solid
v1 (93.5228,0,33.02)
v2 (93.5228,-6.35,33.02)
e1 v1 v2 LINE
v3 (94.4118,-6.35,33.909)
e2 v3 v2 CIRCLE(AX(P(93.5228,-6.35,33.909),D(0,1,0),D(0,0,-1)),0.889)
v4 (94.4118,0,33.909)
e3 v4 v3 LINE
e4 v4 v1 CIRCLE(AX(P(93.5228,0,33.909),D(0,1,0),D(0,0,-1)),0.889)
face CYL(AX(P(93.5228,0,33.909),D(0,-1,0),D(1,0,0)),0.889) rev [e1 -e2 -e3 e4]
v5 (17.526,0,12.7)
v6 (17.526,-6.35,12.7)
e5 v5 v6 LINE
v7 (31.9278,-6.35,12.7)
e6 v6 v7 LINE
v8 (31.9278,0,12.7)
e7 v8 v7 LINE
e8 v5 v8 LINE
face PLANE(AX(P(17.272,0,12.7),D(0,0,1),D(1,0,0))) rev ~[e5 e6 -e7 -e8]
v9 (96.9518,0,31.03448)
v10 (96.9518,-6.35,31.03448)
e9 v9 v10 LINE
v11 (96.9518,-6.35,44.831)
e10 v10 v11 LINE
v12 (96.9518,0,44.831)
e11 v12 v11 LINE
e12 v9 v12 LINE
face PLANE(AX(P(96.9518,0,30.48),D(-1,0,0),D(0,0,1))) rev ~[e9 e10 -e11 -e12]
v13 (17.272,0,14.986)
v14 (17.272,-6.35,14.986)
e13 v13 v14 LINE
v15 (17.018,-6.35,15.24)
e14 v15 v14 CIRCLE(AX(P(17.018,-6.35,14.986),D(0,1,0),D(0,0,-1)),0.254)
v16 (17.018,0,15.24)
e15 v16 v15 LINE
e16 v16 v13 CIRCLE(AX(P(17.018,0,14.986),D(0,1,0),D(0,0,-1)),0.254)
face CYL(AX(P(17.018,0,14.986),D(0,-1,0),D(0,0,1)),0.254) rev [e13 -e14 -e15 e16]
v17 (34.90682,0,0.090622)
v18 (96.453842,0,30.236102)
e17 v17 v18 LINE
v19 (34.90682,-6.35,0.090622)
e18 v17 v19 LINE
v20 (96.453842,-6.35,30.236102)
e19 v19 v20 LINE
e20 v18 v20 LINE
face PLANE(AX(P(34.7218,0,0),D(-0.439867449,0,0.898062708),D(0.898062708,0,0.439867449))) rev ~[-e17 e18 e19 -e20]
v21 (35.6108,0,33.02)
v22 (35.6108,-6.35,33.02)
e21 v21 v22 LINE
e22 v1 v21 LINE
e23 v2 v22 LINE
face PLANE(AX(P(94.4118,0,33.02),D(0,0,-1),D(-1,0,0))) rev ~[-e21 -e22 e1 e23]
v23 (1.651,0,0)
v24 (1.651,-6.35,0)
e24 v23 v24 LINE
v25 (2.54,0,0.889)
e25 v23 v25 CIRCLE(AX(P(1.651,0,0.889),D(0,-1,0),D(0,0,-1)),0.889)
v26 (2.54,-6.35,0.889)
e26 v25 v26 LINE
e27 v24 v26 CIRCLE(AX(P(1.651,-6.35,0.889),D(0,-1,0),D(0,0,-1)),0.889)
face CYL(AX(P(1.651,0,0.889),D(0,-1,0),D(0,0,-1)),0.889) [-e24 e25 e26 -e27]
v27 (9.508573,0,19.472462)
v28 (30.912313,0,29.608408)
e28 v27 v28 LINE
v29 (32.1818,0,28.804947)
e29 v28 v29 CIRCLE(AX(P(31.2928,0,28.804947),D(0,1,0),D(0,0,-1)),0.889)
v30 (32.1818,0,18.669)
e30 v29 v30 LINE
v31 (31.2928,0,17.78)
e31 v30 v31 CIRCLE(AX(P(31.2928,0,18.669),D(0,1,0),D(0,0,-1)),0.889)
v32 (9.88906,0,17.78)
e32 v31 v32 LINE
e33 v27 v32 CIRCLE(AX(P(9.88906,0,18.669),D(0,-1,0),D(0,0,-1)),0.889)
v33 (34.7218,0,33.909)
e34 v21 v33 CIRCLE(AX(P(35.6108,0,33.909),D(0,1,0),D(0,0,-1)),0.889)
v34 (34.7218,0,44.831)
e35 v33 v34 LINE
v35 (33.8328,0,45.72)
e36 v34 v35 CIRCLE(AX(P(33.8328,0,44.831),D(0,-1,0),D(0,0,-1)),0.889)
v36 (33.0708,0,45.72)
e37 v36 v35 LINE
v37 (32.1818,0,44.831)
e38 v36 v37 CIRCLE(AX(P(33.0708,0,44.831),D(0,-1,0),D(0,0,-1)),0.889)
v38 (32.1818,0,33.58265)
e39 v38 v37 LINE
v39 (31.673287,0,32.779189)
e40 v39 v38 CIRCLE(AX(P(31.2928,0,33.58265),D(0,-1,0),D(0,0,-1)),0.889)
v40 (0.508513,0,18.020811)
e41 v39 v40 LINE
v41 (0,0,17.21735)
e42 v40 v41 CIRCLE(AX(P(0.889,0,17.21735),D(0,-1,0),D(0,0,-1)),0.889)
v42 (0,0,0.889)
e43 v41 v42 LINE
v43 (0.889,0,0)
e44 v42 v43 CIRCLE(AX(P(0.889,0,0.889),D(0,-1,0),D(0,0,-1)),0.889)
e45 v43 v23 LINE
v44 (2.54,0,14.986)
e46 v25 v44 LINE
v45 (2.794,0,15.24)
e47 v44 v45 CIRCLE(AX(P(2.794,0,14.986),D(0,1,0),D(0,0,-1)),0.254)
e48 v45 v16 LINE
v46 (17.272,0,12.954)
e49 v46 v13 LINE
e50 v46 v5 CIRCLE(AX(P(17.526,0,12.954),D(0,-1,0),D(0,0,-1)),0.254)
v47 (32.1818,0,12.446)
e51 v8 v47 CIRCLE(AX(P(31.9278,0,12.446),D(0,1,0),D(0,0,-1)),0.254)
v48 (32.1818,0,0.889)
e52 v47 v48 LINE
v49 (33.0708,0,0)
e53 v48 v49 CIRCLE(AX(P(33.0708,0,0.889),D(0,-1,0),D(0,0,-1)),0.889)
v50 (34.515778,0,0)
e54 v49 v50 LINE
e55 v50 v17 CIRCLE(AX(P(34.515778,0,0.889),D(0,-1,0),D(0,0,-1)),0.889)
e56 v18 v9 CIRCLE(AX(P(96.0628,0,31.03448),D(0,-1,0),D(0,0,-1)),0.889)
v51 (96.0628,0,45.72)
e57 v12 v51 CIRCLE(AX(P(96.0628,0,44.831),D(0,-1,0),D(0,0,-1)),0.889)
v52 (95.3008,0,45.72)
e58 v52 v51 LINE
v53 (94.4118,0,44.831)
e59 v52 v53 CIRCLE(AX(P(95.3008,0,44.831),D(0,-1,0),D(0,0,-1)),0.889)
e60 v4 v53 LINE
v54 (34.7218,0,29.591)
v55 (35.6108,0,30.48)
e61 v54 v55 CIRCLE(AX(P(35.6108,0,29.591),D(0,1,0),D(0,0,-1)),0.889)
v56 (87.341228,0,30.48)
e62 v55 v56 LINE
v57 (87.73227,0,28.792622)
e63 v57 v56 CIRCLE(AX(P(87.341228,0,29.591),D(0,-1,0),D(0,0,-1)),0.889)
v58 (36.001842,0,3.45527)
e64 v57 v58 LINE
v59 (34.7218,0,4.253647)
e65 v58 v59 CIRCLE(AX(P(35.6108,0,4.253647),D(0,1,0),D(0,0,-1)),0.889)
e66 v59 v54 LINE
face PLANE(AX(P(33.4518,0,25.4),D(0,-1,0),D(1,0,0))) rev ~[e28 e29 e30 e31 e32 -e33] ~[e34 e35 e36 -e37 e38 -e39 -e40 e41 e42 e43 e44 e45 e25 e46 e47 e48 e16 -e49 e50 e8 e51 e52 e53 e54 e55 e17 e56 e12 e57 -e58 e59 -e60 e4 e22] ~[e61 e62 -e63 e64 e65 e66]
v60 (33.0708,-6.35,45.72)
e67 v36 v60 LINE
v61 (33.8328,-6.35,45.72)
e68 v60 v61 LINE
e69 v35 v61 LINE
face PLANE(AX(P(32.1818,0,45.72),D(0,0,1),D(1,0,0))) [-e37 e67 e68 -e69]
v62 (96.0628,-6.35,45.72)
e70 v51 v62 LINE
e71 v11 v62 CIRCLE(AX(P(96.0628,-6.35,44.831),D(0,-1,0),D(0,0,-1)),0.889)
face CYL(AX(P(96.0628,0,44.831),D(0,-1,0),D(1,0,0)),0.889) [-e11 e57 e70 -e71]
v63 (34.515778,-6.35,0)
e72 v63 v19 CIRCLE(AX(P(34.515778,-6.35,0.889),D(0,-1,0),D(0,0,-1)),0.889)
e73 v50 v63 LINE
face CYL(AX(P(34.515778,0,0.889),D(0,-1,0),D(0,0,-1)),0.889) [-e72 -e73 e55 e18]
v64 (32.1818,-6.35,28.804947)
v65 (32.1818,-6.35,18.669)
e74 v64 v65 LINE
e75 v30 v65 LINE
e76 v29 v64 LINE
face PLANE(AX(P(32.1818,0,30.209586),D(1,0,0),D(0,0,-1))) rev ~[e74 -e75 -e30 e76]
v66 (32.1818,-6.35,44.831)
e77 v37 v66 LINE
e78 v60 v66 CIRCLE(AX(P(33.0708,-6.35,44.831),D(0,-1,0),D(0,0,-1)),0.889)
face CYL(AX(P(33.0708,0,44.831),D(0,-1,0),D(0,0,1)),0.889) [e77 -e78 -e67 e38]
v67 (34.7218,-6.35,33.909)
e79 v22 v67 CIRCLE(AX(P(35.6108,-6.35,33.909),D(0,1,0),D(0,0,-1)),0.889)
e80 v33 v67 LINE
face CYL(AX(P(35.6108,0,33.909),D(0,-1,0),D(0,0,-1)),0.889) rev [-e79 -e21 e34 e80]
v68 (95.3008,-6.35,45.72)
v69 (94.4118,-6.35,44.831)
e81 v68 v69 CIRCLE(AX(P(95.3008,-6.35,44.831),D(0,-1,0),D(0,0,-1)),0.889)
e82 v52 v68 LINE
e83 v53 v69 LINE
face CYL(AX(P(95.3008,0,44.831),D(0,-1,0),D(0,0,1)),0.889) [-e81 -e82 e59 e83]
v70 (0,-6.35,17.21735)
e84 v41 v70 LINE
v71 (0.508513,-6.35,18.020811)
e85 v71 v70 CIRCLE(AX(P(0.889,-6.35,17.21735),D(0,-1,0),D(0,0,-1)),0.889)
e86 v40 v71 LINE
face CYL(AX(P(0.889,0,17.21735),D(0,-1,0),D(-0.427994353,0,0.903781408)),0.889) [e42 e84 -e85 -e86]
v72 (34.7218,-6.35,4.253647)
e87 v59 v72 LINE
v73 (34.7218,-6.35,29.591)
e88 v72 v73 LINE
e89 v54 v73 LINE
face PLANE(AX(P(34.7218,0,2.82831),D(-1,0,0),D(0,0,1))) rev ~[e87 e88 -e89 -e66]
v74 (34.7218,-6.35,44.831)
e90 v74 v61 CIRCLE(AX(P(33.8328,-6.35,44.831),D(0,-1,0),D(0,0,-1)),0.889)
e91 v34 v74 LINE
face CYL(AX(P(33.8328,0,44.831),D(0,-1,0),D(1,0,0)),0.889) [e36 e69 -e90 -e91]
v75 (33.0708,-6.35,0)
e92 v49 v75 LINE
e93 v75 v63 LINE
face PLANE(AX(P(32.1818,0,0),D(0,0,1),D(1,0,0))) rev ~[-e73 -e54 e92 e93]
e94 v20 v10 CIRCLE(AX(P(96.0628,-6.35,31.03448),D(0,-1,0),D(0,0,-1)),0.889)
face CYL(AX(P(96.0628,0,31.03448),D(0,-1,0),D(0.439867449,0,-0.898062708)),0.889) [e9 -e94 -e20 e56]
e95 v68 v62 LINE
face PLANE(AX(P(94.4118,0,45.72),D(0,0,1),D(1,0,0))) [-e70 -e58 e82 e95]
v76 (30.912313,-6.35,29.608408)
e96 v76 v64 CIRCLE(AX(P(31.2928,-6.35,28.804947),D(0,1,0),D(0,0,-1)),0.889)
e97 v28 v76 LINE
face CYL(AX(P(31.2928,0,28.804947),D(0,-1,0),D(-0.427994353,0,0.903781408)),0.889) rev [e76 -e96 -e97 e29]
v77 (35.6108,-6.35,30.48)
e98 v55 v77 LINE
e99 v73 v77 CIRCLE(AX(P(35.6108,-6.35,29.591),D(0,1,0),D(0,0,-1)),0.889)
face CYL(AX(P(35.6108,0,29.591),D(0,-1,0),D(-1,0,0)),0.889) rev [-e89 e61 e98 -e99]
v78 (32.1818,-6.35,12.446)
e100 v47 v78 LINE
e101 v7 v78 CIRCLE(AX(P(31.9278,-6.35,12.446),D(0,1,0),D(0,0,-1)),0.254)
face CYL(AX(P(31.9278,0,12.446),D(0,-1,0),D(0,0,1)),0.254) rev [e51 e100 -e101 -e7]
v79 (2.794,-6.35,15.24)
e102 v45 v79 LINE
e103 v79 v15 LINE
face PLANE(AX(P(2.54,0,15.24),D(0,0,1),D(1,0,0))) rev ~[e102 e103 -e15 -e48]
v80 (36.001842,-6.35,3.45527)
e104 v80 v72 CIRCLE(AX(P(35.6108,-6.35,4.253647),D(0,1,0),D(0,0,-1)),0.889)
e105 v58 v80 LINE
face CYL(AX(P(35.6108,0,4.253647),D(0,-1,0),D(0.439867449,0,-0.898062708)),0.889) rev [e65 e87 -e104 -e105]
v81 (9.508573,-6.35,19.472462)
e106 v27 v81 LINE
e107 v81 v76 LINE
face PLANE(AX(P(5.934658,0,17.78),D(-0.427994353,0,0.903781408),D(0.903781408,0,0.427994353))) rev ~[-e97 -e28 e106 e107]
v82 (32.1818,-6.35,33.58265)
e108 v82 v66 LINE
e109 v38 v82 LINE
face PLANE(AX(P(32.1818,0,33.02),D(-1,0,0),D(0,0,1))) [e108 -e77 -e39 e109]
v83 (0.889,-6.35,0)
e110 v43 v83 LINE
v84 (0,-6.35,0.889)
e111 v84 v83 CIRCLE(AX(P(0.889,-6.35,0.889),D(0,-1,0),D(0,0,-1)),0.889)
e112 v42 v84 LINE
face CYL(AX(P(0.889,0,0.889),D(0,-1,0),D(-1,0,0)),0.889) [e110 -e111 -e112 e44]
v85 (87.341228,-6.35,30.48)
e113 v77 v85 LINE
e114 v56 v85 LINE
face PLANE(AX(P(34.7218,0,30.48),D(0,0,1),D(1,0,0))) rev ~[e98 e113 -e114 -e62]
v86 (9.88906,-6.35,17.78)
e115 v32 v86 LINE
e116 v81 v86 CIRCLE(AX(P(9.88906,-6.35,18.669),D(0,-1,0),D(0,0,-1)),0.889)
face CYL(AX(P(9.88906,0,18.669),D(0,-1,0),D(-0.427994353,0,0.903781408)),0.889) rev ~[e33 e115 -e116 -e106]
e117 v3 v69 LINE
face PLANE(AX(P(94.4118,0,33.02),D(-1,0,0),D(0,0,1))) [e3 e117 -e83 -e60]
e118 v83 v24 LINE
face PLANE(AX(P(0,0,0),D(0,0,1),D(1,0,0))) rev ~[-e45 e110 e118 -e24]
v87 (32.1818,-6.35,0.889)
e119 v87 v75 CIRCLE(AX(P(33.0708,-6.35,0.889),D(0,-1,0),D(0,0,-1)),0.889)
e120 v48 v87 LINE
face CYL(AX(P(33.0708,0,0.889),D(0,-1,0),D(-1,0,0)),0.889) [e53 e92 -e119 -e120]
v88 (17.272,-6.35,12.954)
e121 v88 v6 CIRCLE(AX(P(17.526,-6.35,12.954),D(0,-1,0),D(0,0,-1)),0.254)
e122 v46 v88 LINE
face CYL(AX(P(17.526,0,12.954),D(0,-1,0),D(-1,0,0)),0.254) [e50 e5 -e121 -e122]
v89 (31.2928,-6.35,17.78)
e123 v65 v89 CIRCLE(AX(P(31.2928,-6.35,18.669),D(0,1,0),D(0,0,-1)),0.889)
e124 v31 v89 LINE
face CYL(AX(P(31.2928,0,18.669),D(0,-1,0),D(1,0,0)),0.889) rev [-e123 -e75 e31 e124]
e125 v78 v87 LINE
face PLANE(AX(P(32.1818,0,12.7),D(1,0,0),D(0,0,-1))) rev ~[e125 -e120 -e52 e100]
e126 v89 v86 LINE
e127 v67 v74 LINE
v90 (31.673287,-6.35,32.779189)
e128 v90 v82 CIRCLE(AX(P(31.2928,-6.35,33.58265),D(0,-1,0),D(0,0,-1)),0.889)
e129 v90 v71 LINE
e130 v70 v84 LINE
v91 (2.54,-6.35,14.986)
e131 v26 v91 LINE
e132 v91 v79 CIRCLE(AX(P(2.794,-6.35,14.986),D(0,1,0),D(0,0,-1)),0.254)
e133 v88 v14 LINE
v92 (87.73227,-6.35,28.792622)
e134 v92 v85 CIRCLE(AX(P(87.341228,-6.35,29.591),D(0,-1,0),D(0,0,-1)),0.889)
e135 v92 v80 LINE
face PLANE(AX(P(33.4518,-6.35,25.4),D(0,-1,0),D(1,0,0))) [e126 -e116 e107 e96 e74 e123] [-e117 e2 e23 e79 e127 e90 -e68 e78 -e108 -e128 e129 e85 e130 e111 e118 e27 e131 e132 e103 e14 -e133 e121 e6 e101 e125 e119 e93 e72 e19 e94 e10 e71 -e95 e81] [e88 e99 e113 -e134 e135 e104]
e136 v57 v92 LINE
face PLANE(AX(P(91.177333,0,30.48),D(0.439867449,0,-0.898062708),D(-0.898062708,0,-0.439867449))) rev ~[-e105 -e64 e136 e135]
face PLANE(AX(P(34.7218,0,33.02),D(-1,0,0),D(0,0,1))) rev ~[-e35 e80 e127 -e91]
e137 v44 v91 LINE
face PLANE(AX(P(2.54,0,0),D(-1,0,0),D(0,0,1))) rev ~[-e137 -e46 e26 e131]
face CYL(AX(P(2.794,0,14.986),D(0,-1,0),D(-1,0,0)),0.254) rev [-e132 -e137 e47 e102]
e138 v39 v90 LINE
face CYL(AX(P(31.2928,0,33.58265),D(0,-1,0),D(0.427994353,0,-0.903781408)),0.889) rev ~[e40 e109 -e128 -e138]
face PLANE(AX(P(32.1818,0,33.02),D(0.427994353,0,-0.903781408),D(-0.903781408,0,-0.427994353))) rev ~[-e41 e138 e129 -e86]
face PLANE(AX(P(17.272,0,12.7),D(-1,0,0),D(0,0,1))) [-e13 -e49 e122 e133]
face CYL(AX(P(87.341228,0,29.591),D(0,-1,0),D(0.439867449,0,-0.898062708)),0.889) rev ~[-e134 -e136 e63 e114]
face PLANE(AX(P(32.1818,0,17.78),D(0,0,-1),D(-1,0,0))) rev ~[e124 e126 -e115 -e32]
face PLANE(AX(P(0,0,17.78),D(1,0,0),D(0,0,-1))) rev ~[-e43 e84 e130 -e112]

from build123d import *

# Parameters (mm, degrees)
F0_W     = 14.9098
F0_H     = 2.54
F0_W_2   = 2.54
F0_H_2   = 12.7
F1_DEPTH = 6.35
F2_R     = 0.889
F3_R     = 0.254


# Not quite as in the source:
# - a feature names something its author has since deleted; it is built from what else it names


with BuildPart() as f1:
    # F0 (on Front) → F1 (new body)
    with BuildSketch(Plane.XZ):
        Polygon((32.1818, 20.32), (32.1818, 17.78), (34.7218, 17.78), (34.7218, 30.48), (34.7218, 33.02), (32.1818, 33.02), (32.1818, 30.2095859146), align=None)
        Polygon((34.7218, 17.78), (32.1818, 17.78), (32.1818, 15.24), (32.1818, 12.7), (32.1818, 0), (34.7218, 0), (34.7218, 2.8283102922), (34.7218, 13.97), align=None)
        Polygon((0, 17.78), (2.54, 17.78), (5.9346577437, 17.78), (32.1818, 30.2095859146), (32.1818, 33.02), align=None)
        Polygon((5.9346577437, 17.78), (2.54, 17.78), (2.54, 15.24), (17.272, 15.24), (32.1818, 15.24), (32.1818, 17.78), align=None)
        with Locations((24.7269, 13.97)):
            Rectangle(F0_W, F0_H)
        Polygon((2.54, 15.24), (2.54, 17.78), (0, 17.78), (0, 0), (2.54, 0), align=None)
        Polygon((91.1773331535, 30.48), (34.7218, 2.8283102922), (34.7218, 0), (96.9518, 30.48), align=None)
        Polygon((94.4118, 33.02), (34.7218, 33.02), (34.7218, 30.48), (91.1773331535, 30.48), (96.9518, 30.48), (96.9518, 33.02), align=None)
        with Locations((95.6818, 39.37)):
            Rectangle(F0_W_2, F0_H_2)
        with Locations((33.4518, 39.37)):
            Rectangle(F0_W_2, F0_H_2)
    extrude(amount=F1_DEPTH)

    # F2
    f2_edges = [f1.edges().sort_by_distance(p)[0] for p in [
        (0, -3.175, 0),
        (2.54, -3.175, 0),
        (32.1818, -3.175, 0),
        (34.7218, -3.175, 0),
        (32.1818, -3.175, 33.02),
        (0, -3.175, 17.78),
        (32.1818, -3.175, 17.78),
        (32.1818, -3.175, 30.209586),
        (5.934658, -3.175, 17.78),
        (34.7218, -3.175, 2.82831),
        (34.7218, -3.175, 30.48),
        (91.177333, -3.175, 30.48),
        (96.9518, -3.175, 30.48),
        (96.9518, -3.175, 45.72),
        (94.4118, -3.175, 45.72),
        (94.4118, -3.175, 33.02),
        (32.1818, -3.175, 45.72),
        (34.7218, -3.175, 45.72),
        (34.7218, -3.175, 33.02),
    ]]
    fillet(f2_edges, radius=F2_R)

    # F3
    f3_edges = [f1.edges().sort_by_distance(p)[0] for p in [
        (2.54, -3.175, 15.24),
        (17.272, -3.175, 15.24),
        (17.272, -3.175, 12.7),
        (32.1818, -3.175, 12.7),
    ]]
    fillet(f3_edges, radius=F3_R)


solid = f1.part
